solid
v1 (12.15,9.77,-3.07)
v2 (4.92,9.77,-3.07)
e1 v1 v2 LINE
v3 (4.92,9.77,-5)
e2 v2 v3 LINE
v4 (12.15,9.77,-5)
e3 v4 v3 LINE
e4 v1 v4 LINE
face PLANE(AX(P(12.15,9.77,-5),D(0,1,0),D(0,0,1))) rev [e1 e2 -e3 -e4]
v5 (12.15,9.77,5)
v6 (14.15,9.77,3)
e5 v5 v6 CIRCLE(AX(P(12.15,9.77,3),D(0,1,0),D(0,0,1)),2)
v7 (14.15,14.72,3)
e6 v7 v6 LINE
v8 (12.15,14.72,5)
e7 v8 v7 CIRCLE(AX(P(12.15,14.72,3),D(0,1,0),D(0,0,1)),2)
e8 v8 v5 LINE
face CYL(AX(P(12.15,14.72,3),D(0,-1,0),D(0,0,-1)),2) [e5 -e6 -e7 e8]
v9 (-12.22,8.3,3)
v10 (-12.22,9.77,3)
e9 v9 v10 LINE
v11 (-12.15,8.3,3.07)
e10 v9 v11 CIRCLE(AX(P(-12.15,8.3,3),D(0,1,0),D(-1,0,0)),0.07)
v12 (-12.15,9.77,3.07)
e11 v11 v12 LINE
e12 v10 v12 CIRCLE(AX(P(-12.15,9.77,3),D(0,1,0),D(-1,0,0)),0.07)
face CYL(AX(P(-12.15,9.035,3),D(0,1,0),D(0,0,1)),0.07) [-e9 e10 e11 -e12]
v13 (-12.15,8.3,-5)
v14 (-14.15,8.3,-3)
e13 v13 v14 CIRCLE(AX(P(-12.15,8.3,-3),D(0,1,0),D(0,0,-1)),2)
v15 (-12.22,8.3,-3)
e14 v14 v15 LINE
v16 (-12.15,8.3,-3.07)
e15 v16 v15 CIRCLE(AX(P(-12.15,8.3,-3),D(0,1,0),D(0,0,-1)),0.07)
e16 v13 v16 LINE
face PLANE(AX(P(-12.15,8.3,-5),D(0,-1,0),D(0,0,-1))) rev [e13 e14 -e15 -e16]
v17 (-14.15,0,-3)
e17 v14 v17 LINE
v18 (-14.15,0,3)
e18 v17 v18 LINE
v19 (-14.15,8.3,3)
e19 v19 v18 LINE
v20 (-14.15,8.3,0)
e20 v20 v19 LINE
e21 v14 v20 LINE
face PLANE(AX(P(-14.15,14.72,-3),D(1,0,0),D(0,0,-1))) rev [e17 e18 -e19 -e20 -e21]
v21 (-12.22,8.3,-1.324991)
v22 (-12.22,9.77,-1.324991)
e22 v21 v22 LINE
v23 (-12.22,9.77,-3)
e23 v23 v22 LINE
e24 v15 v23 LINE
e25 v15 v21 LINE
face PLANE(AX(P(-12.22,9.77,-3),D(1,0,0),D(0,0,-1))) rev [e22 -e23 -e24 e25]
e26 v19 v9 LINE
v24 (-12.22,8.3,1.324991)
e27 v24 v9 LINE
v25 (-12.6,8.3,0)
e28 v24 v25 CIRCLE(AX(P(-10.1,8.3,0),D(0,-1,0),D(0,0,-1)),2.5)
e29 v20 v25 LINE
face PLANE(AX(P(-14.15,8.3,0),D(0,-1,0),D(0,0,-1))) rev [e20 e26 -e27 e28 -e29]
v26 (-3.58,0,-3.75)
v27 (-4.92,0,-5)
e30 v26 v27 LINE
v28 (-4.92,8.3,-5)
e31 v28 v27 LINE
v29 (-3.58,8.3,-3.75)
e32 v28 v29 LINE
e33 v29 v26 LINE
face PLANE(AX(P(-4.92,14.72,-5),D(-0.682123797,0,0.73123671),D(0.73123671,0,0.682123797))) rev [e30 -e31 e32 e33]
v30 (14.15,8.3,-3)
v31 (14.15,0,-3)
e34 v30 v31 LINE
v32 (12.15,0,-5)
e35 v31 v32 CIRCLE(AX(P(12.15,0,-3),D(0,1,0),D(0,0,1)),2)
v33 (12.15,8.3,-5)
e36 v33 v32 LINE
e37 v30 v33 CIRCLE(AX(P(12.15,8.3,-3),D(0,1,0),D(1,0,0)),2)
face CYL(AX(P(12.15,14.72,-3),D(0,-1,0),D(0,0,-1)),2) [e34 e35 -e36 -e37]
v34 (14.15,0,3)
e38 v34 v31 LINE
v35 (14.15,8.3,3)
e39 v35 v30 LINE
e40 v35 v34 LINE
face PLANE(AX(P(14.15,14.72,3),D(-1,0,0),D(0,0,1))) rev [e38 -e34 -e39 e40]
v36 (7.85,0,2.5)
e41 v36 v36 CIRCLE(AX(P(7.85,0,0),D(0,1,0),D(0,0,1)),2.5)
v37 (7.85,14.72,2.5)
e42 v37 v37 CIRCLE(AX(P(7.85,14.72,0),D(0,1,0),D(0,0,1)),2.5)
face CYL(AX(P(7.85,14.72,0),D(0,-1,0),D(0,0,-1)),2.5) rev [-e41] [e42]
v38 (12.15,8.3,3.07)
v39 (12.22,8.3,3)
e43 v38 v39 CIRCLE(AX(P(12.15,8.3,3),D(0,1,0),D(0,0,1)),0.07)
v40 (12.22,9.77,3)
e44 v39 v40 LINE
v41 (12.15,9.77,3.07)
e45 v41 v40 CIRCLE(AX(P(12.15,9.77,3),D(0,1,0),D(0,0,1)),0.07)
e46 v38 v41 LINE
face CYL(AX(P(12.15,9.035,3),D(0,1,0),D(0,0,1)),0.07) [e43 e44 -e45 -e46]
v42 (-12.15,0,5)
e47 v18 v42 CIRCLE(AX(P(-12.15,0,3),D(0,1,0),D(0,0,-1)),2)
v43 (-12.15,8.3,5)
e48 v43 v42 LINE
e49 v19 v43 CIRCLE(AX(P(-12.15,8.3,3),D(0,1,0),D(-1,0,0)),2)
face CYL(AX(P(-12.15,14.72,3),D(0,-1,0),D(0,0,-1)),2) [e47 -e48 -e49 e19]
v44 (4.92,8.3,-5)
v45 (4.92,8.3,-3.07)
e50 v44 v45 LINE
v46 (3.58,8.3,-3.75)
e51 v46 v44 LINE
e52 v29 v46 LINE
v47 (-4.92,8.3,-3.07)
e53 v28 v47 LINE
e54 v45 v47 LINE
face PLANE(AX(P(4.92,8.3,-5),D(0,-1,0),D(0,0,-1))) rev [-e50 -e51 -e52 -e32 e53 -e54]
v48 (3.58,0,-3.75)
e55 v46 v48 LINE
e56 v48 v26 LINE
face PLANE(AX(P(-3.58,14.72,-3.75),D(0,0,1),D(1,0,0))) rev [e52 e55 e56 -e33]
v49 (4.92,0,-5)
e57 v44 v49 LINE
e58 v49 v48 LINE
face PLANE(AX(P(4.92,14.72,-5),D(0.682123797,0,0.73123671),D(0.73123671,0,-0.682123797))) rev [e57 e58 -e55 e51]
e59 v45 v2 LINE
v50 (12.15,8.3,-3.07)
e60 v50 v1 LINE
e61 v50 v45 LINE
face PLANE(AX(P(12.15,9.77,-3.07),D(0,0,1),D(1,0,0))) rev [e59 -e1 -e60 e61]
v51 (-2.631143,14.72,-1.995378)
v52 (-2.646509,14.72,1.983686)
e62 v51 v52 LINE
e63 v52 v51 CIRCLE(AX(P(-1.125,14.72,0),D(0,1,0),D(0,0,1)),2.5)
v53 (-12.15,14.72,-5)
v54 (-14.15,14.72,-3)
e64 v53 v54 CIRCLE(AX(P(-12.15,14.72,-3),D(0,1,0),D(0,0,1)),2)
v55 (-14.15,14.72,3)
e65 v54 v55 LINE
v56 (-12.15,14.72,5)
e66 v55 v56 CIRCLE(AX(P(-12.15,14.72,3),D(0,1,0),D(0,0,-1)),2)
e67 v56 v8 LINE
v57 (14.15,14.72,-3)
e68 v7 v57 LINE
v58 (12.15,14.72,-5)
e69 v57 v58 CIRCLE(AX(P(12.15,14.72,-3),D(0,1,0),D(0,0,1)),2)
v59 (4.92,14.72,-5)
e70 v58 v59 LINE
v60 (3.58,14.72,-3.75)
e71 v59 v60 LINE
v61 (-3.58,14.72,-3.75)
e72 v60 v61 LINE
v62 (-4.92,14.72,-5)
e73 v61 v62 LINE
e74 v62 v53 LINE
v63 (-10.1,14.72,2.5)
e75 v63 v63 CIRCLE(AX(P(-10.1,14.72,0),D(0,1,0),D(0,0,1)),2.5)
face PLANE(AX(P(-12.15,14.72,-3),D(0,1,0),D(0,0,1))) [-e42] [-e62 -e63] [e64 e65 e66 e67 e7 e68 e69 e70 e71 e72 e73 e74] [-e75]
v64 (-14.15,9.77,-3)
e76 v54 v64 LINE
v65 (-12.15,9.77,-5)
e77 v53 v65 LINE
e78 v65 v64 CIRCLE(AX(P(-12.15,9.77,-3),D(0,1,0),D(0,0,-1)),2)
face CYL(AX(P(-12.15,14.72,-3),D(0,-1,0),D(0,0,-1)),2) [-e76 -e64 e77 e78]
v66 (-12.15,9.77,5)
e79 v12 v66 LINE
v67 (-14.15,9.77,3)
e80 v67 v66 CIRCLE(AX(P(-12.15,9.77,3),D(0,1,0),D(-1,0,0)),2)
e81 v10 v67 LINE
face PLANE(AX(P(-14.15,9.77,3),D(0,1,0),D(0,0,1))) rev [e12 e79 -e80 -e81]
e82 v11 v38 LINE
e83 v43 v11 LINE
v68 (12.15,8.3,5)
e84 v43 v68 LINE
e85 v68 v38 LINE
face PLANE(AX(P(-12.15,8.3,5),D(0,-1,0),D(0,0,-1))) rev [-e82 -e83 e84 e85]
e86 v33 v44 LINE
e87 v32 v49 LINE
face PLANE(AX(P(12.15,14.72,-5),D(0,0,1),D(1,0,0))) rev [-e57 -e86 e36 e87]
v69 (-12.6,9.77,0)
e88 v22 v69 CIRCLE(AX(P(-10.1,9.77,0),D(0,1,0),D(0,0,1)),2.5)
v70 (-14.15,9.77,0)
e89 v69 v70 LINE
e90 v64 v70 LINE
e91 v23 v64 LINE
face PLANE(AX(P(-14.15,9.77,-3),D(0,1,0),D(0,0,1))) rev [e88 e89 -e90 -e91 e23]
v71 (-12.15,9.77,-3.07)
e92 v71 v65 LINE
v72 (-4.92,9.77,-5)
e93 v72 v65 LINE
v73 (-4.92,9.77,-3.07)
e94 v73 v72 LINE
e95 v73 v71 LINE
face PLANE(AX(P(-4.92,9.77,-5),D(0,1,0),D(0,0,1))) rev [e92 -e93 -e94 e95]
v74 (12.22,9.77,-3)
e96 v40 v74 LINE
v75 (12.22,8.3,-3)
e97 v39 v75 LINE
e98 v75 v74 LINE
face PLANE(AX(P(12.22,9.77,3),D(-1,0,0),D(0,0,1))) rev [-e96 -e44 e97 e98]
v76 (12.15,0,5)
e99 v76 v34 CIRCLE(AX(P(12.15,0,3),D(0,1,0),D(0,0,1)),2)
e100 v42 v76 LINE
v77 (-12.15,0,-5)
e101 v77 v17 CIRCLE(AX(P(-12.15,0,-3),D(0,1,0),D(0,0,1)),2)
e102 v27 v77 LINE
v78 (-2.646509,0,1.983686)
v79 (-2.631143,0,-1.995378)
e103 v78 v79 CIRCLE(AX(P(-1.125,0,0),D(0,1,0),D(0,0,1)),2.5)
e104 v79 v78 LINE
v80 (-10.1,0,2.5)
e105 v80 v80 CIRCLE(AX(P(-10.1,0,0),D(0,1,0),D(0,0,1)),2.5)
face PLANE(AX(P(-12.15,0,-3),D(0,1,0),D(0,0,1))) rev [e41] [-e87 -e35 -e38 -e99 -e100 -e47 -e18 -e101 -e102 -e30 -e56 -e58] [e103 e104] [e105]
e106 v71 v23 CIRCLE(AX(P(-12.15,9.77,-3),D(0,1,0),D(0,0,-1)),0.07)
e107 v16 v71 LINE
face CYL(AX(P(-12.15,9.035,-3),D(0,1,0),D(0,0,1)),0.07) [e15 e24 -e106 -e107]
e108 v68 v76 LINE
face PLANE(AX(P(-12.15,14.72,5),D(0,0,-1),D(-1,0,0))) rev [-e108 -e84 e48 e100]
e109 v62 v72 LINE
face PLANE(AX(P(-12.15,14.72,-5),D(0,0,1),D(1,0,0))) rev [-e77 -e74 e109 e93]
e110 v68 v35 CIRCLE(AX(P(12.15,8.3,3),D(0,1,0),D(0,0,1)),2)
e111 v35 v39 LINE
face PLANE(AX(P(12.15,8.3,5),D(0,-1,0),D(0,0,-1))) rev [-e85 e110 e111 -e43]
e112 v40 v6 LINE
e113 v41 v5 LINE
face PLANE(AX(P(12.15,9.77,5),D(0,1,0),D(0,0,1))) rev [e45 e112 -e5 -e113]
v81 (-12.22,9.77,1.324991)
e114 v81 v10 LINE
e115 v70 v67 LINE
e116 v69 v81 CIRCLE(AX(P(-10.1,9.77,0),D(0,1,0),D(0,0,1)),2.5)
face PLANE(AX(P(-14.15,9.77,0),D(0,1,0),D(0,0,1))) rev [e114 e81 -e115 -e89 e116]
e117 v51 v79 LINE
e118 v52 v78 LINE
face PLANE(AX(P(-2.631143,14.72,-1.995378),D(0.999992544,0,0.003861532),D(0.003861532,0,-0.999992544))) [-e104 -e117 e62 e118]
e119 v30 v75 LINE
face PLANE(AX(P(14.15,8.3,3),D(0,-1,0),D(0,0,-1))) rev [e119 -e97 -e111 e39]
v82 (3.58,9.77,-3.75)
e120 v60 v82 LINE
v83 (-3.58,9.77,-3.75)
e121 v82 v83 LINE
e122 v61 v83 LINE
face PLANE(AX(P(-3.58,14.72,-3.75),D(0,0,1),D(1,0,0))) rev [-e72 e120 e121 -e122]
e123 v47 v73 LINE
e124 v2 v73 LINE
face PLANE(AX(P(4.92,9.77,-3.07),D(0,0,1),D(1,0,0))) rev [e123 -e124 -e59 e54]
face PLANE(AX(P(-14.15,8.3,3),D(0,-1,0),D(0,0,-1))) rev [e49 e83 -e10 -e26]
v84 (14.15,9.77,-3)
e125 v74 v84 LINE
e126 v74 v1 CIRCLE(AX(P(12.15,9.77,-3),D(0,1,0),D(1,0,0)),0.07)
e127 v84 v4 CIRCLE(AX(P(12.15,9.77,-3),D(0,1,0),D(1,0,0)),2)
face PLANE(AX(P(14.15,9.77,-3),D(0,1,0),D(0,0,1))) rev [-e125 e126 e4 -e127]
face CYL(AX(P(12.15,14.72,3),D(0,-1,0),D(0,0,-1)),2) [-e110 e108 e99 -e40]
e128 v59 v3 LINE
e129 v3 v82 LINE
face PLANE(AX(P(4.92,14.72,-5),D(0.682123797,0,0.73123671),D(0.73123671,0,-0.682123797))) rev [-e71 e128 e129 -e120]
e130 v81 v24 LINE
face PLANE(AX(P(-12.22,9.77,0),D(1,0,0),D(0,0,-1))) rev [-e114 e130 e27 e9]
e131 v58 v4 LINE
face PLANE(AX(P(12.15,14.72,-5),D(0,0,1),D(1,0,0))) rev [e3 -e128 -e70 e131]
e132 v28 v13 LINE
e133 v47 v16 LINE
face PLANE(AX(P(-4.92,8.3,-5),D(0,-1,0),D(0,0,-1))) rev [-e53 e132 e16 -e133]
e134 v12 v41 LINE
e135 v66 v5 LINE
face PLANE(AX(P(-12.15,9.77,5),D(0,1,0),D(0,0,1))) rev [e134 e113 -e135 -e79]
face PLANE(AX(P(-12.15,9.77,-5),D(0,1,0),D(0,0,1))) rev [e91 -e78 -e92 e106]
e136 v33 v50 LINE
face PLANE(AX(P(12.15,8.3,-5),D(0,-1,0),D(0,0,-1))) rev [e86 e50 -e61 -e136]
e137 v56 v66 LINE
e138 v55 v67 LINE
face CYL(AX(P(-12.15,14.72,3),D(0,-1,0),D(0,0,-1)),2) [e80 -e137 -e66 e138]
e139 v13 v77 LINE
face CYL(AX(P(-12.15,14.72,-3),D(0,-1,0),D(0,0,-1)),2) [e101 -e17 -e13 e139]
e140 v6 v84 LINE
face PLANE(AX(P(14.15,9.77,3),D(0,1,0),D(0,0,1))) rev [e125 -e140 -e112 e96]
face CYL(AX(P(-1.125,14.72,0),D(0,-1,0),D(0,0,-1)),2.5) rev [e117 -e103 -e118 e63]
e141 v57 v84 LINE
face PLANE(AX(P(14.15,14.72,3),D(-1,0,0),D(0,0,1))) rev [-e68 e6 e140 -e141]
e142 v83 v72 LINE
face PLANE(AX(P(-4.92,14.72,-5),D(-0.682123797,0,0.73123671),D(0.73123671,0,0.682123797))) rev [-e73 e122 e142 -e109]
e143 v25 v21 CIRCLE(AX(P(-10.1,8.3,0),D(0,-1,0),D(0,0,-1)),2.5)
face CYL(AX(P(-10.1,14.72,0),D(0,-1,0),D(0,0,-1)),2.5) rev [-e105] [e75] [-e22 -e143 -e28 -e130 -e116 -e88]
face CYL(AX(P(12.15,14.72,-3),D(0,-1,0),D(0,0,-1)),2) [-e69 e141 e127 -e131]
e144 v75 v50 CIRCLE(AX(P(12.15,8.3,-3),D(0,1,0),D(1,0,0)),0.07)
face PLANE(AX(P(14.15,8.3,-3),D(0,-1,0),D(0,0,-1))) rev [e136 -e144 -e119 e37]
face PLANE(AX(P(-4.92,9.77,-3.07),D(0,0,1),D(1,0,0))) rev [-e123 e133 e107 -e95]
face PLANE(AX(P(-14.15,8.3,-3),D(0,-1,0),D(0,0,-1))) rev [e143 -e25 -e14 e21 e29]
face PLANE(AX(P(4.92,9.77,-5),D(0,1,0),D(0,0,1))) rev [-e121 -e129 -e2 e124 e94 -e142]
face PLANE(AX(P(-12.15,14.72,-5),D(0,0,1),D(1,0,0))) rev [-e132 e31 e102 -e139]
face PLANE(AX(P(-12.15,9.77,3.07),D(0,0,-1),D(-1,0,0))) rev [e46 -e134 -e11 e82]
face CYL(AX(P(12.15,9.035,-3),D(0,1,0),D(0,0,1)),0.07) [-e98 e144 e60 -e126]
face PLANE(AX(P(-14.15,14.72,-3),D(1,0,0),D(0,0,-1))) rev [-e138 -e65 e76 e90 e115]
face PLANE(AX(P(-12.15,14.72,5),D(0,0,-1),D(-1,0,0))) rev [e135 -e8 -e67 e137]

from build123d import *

# Parameters (mm, degrees)
SKETCH1_R           = 2.5
BOSS_EXTRUDE2_DEPTH = 14.72
CUT_SWEEP1_START    = 8.3
CUT_SWEEP1_DEPTH    = 1.47


# Read off the part's stored shape, not the designer's step: Cut-Sweep1
with BuildPart() as part:
    # Sketch1 → Boss-Extrude2 (new body)
    with BuildSketch(Plane(origin=(0, 0, 0), x_dir=(1, 0, 0), z_dir=(0, 1, 0))):
        with BuildLine():
            Line((-12.15, -5), (12.15, -5))
            ThreePointArc((12.15, -5), (13.564213562, -4.414213562), (14.15, -3))
            Line((14.15, -3), (14.15, 3))
            ThreePointArc((14.15, 3), (13.564213562, 4.414213562), (12.15, 5))
            Line((12.15, 5), (4.92, 5))
            Line((4.92, 5), (3.58, 3.75))
            Line((3.58, 3.75), (-3.58, 3.75))
            Line((-3.58, 3.75), (-4.92, 5))
            Line((-4.92, 5), (-12.15, 5))
            ThreePointArc((-12.15, 5), (-13.564213562, 4.414213562), (-14.15, 3))
            Line((-14.15, 3), (-14.15, -3))
            ThreePointArc((-14.15, -3), (-13.564213562, -4.414213562), (-12.15, -5))
        make_face()
        with Locations(Location((7.85, 0, 0), (0, 0, 270))):
            Circle(SKETCH1_R, mode=Mode.SUBTRACT)
        with Locations(Location((-10.1, 0, 0), (0, 0, 270))):
            Circle(SKETCH1_R, mode=Mode.SUBTRACT)
        with BuildLine():
            Line((-2.631143176, 1.995377842), (-2.646508574, -1.983686381))
            ThreePointArc((-2.646508574, -1.983686381), (1.374981361, -0.00965383), (-2.631143176, 1.995377842))
        make_face(mode=Mode.SUBTRACT)
    extrude(amount=BOSS_EXTRUDE2_DEPTH)

    # Cut-Sweep1 outline → Cut-Sweep1 (cut)
    with BuildSketch(Plane(origin=(0, 0, 0), x_dir=(1, 0, 0), z_dir=(0, 1, 0)).offset(CUT_SWEEP1_START)):
        with BuildLine():
            ThreePointArc((-12.15, 5), (-13.564213562, 4.414213562), (-14.15, 3))
            Line((-14.15, 3), (-14.15, -3))
            ThreePointArc((-14.15, -3), (-13.564213562, -4.414213562), (-12.15, -5))
            Line((-12.15, -5), (12.15, -5))
            ThreePointArc((12.15, -5), (13.564213562, -4.414213562), (14.15, -3))
            Line((14.15, -3), (14.15, 3))
            ThreePointArc((14.15, 3), (13.564213562, 4.414213562), (12.15, 5))
            Line((12.15, 5), (4.92, 5))
            Line((4.92, 5), (3.58, 3.75))
            Line((3.58, 3.75), (-3.58, 3.75))
            Line((-3.58, 3.75), (-4.92, 5))
            Line((-4.92, 5), (-12.15, 5))
        make_face()
        with BuildLine():
            ThreePointArc((-12.22, -1.324990566), (-12.6, 0), (-12.22, 1.324990566))
            Line((-12.22, 1.324990566), (-12.22, 3))
            ThreePointArc((-12.22, 3), (-12.199497475, 3.049497475), (-12.15, 3.07))
            Line((-12.15, 3.07), (12.15, 3.07))
            ThreePointArc((12.15, 3.07), (12.199497475, 3.049497475), (12.22, 3))
            Line((12.22, 3), (12.22, -3))
            ThreePointArc((12.22, -3), (12.199497475, -3.049497475), (12.15, -3.07))
            Line((12.15, -3.07), (-12.15, -3.07))
            ThreePointArc((-12.15, -3.07), (-12.199497475, -3.049497475), (-12.22, -3))
            Line((-12.22, -3), (-12.22, -1.324990566))
        make_face(mode=Mode.SUBTRACT)
    extrude(amount=CUT_SWEEP1_DEPTH, mode=Mode.SUBTRACT)


solid = part.part
